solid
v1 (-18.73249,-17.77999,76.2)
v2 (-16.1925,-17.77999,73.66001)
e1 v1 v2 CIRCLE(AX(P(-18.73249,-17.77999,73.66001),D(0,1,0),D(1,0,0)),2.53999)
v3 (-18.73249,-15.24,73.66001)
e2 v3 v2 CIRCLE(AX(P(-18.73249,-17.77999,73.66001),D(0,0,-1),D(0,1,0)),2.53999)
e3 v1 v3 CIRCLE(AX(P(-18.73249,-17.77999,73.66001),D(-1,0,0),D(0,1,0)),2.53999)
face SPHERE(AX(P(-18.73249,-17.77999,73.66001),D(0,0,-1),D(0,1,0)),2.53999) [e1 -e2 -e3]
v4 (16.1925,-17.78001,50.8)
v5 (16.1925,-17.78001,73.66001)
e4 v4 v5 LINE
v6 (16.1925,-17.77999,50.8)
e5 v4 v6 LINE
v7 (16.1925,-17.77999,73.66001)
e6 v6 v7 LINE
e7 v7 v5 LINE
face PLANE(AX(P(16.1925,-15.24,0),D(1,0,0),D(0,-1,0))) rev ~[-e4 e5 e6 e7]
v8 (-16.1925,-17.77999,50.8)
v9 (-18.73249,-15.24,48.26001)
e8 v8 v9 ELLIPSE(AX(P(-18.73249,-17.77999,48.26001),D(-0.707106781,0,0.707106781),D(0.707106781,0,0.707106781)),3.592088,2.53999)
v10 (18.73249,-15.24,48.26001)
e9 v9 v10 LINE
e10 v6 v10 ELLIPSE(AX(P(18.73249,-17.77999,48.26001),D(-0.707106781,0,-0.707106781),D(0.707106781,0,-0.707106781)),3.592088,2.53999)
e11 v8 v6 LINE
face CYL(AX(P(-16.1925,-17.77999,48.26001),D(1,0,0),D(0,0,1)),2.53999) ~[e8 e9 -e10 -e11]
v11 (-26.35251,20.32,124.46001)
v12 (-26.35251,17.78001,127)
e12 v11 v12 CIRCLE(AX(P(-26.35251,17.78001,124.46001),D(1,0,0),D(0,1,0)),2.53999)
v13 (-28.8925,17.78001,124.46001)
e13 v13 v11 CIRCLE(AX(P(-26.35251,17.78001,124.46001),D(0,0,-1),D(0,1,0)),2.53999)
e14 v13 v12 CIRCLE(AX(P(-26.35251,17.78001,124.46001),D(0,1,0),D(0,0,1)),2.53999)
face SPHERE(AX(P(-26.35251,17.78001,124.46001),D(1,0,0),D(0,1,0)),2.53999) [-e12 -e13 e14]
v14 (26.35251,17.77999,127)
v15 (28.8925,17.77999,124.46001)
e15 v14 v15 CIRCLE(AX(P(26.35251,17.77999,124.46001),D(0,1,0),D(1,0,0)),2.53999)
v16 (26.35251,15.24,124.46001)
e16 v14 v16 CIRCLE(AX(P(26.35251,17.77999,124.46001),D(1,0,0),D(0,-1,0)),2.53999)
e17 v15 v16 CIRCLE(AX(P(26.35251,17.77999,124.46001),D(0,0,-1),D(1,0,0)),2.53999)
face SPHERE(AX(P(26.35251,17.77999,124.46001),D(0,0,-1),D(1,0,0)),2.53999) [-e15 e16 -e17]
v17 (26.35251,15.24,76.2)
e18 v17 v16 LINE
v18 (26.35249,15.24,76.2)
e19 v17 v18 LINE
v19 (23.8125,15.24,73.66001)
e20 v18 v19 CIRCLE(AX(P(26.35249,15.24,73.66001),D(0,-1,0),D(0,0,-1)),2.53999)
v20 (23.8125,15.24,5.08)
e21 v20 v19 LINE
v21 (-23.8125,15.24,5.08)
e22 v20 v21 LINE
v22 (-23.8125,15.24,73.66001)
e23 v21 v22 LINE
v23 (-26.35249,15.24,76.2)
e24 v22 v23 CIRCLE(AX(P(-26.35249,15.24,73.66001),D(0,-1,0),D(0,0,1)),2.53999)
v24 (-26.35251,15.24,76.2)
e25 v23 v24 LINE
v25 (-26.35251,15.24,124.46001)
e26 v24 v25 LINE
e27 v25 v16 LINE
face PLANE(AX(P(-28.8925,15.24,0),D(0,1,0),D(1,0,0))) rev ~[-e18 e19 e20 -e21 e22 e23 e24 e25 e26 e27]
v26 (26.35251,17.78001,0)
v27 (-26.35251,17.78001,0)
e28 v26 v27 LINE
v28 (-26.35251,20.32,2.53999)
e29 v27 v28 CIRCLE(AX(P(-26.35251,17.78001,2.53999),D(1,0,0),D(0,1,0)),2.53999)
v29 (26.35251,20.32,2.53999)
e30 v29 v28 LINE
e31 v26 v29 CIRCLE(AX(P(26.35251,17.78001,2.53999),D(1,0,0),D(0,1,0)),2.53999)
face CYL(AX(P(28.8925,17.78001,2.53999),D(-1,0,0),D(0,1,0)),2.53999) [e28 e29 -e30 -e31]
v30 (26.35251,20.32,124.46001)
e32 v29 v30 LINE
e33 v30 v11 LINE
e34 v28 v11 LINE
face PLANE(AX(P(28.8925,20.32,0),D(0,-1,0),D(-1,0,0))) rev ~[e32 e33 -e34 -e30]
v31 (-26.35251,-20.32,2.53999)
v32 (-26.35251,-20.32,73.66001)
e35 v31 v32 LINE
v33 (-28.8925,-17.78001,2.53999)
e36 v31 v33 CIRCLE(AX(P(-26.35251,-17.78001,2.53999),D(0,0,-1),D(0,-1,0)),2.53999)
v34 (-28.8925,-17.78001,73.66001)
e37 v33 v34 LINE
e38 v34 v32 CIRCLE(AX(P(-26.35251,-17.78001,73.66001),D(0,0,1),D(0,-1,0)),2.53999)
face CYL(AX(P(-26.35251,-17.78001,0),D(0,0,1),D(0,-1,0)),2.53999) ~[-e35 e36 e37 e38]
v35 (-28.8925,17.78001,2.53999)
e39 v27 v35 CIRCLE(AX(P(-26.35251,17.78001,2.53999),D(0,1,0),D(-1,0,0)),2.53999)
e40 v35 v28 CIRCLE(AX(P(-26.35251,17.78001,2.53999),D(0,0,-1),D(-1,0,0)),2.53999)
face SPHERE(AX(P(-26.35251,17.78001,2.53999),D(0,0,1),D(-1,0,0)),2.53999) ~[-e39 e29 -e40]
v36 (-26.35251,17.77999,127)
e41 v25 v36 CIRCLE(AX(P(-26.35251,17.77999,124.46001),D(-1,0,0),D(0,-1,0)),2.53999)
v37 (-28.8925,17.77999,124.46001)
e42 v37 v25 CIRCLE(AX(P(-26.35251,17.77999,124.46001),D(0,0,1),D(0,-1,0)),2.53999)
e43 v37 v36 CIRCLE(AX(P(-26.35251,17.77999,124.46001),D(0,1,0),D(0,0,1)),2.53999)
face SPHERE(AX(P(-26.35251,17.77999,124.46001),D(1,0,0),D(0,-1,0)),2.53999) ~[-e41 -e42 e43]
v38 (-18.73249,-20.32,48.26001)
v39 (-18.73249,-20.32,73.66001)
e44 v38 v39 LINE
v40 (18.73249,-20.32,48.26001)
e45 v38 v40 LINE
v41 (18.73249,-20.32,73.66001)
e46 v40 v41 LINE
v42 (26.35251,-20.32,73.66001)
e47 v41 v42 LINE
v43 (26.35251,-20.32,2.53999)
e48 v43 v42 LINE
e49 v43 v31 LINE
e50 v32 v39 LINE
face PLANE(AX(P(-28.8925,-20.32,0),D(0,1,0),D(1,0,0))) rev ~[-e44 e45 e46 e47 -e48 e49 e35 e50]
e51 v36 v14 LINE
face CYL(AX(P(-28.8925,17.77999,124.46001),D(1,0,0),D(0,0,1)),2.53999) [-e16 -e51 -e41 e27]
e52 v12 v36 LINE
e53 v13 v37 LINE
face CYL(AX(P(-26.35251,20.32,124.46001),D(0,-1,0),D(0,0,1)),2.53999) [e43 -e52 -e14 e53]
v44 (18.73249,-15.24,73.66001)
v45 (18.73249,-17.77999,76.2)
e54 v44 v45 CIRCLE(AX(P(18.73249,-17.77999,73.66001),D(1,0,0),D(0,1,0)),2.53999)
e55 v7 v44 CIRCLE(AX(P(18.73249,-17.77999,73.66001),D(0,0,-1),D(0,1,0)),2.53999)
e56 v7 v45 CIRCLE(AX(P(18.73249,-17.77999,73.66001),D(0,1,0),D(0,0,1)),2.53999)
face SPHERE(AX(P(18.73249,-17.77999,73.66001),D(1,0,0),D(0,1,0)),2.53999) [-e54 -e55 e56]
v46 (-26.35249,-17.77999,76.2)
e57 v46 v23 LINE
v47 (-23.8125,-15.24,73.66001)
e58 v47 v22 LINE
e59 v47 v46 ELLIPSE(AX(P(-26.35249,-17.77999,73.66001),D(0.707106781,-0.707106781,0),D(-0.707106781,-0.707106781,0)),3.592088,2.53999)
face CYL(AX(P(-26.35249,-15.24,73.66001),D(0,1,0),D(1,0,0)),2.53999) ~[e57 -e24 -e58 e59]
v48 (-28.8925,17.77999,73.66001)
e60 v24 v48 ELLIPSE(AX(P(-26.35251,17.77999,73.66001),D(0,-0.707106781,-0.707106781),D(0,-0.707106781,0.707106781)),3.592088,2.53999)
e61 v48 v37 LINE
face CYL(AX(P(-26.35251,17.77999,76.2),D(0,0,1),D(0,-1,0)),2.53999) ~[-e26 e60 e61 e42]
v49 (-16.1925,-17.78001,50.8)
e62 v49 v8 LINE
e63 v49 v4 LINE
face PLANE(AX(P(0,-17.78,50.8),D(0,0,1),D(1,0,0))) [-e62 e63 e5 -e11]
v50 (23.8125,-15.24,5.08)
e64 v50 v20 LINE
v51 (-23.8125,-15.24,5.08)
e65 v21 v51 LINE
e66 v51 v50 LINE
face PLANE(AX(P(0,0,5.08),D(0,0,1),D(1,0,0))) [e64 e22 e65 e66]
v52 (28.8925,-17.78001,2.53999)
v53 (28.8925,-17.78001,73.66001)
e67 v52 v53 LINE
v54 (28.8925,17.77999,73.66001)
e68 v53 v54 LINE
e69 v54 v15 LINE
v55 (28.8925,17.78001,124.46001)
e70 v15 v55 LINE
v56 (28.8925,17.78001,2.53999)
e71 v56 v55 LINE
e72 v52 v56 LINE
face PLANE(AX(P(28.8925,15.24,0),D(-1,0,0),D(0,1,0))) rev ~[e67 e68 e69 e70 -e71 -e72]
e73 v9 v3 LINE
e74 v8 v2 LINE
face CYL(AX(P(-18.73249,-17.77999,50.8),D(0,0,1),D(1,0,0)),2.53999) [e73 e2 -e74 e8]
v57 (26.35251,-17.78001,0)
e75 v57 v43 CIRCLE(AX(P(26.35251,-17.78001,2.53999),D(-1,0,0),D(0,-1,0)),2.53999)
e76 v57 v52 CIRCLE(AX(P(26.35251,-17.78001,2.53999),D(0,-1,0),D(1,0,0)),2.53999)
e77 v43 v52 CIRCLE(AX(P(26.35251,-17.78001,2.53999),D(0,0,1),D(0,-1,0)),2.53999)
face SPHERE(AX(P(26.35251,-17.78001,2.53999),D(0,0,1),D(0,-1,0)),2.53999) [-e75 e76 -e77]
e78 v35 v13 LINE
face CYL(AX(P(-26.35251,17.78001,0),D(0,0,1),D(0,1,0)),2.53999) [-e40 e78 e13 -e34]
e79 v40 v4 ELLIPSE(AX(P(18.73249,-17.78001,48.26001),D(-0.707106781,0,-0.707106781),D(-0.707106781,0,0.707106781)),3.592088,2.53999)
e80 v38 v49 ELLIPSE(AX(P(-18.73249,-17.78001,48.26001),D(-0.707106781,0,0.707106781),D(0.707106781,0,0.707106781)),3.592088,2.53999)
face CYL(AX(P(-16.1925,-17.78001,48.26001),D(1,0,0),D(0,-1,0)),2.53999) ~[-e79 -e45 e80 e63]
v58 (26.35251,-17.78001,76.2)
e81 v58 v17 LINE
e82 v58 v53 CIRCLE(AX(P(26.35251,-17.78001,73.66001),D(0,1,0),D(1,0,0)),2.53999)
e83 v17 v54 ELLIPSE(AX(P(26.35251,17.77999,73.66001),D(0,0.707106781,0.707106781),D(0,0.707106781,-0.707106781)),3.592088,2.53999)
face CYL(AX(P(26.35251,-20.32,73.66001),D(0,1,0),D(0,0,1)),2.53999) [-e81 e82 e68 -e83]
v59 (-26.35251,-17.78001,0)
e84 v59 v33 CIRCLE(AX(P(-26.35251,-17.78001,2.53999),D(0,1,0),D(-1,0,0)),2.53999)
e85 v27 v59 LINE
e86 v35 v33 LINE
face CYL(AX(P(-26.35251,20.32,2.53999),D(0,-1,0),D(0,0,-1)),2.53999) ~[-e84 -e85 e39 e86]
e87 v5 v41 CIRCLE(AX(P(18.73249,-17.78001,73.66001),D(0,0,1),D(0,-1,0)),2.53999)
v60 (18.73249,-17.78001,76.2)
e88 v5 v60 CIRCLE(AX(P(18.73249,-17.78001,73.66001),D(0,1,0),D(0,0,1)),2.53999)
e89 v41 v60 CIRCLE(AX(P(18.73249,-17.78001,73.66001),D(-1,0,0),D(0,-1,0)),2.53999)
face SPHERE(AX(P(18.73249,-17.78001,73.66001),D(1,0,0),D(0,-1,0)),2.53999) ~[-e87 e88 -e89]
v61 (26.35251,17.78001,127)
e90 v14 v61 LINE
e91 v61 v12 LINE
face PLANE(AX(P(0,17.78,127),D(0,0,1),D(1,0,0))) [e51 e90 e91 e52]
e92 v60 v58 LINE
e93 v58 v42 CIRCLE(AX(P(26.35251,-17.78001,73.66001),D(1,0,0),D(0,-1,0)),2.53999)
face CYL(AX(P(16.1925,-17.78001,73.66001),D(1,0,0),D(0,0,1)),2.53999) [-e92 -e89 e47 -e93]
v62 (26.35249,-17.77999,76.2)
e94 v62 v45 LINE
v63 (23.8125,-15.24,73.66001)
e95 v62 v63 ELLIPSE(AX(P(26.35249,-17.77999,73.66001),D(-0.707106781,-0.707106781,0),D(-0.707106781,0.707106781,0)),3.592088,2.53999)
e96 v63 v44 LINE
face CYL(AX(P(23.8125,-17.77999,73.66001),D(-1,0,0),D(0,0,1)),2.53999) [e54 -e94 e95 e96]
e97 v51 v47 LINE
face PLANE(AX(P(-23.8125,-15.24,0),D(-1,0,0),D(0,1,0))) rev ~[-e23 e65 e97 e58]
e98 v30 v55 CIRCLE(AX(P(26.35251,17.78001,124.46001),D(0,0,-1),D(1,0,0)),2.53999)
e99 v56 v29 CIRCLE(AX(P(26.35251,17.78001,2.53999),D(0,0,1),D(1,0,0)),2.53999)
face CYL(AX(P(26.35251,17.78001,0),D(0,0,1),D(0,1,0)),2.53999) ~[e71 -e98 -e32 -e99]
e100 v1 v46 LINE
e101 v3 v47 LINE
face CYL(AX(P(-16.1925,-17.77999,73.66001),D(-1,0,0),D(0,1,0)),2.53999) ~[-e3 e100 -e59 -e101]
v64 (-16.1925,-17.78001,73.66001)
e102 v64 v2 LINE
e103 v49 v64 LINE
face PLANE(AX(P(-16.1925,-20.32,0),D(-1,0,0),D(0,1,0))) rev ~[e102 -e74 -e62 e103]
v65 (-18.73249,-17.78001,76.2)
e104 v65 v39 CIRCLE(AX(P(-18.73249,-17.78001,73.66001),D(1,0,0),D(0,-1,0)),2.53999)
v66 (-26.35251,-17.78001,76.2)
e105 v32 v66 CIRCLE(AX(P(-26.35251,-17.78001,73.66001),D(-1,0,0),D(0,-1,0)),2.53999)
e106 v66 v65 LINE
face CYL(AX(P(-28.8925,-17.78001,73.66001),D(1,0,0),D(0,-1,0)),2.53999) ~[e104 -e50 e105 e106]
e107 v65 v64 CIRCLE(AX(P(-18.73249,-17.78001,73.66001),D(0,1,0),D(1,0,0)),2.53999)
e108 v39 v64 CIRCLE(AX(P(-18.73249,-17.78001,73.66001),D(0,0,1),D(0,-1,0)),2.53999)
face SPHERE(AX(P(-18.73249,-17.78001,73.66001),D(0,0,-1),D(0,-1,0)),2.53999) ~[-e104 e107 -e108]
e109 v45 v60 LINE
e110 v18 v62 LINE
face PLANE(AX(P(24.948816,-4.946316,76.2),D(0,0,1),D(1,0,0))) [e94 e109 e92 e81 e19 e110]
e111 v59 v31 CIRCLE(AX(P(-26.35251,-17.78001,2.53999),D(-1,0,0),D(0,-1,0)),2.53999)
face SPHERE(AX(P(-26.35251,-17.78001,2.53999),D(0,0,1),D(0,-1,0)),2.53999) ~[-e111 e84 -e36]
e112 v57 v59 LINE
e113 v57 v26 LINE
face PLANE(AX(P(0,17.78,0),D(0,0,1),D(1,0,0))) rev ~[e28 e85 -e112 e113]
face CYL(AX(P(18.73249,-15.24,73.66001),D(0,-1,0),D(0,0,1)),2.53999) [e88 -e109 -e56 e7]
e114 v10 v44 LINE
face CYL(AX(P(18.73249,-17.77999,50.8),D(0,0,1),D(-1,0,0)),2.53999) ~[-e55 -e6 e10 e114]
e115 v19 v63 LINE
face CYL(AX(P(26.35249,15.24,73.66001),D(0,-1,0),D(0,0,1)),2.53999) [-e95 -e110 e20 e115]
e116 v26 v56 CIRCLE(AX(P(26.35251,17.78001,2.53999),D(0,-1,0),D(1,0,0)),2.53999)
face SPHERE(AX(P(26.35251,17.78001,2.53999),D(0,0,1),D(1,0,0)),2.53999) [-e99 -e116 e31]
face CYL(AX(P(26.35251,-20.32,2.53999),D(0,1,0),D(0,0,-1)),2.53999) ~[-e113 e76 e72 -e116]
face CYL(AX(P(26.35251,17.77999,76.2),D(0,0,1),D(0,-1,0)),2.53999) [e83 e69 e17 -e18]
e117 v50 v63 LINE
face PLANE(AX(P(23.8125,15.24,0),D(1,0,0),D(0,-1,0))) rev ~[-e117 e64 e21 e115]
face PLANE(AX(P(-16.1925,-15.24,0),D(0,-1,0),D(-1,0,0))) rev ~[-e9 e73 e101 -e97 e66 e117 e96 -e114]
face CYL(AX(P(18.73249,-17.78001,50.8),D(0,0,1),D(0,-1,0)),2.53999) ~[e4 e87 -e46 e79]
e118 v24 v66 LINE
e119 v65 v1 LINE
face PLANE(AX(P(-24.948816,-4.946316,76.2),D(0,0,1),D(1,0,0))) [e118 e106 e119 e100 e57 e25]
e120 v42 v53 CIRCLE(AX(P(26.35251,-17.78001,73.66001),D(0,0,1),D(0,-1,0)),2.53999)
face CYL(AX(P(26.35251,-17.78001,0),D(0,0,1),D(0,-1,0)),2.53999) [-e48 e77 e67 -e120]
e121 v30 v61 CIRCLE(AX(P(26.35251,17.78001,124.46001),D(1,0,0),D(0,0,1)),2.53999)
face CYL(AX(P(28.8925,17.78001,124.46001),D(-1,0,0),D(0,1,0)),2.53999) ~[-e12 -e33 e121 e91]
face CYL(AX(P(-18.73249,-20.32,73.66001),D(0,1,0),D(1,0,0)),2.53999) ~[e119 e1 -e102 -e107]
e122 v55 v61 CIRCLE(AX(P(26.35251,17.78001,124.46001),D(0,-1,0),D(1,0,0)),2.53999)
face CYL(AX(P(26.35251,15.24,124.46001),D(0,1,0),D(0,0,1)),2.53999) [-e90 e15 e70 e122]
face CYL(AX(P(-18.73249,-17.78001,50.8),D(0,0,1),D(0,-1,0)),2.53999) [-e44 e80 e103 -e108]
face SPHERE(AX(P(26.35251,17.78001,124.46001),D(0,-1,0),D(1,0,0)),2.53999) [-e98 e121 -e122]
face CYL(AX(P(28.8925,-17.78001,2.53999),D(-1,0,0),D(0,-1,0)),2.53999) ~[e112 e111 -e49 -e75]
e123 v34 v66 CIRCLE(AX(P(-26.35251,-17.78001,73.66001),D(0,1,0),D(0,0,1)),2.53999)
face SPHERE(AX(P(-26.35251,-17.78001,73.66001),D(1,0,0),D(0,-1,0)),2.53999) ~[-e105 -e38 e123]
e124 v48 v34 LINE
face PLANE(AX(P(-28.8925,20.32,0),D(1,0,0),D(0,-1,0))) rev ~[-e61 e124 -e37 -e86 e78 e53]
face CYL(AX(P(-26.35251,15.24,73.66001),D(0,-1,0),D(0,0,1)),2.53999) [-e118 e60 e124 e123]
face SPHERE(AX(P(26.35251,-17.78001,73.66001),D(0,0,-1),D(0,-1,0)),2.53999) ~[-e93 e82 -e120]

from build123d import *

# Parameters (mm, degrees)
F1_DEPTH = 5.08
F0_W     = 32.385
F0_H     = 5.08
F2_DEPTH = 50.8
F3_DEPTH = 76.2
F4_DEPTH = 127
F5_R     = 2.53999


# Not quite as in the source:
# - a fillet or chamfer is up to 0.001 mm smaller than in the source, because OpenCascade refuses the exact size


with BuildPart() as f1:
    # F0 (on Top) → F1 (new body)
    with BuildSketch(Plane.XY):
        Polygon((23.8125, 15.24), (-23.8125, 15.24), (-23.8125, -15.24), (-16.1925, -15.24), (16.1925, -15.24), (23.8125, -15.24), align=None)
    extrude(amount=F1_DEPTH)

    # F0 (on Top) → F2 (join)
    with BuildSketch(Plane.XY):
        with Locations((0, -17.78)):
            Rectangle(F0_W, F0_H)
    extrude(amount=F2_DEPTH)

    # F0 (on Top) → F3 (join)
    with BuildSketch(Plane.XY):
        Polygon((-23.8125, 15.24), (-28.8925, 15.24), (-28.8925, -20.32), (-16.1925, -20.32), (-16.1925, -15.24), (-23.8125, -15.24), align=None)
        Polygon((28.8925, -20.32), (28.8925, 15.24), (23.8125, 15.24), (23.8125, -15.24), (16.1925, -15.24), (16.1925, -20.32), align=None)
    extrude(amount=F3_DEPTH)

    # F0 (on Top) → F4 (join)
    with BuildSketch(Plane.XY):
        Polygon((28.8925, 20.32), (-28.8925, 20.32), (-28.8925, 15.24), (-23.8125, 15.24), (23.8125, 15.24), (28.8925, 15.24), align=None)
    extrude(amount=F4_DEPTH)

    # F5 (radius 2.54 in the source; OpenCascade refuses exactly that, so slightly less here)
    f5_edges = [f1.edges().sort_by_distance(p)[0] for p in [
        (28.8925, -20.32, 38.1),
        (22.5425, -20.32, 76.2),
        (16.1925, -20.32, 63.5),
        (0, -20.32, 50.8),
        (-16.1925, -20.32, 63.5),
        (-22.5425, -20.32, 76.2),
        (-28.8925, -20.32, 38.1),
        (0, -20.32, 0),
        (-16.1925, -15.24, 63.5),
        (0, -15.24, 50.8),
        (-20.0025, -15.24, 76.2),
        (20.0025, -15.24, 76.2),
        (16.1925, -15.24, 63.5),
        (16.1925, -17.78, 76.2),
        (-16.1925, -17.78, 76.2),
        (23.8125, 0, 76.2),
        (-23.8125, 0, 76.2),
        (28.8925, -2.54, 76.2),
        (28.8925, 15.24, 101.6),
        (28.8925, 17.78, 127),
        (28.8925, 20.32, 63.5),
        (28.8925, 0, 0),
        (0, 15.24, 127),
        (-28.8925, 15.24, 101.6),
        (0, 20.32, 127),
        (-28.8925, 20.32, 63.5),
        (-28.8925, -2.54, 76.2),
        (-28.8925, 0, 0),
        (0, 20.32, 0),
        (-28.8925, 17.78, 127),
    ]]
    fillet(f5_edges, radius=F5_R)


solid = f1.part
